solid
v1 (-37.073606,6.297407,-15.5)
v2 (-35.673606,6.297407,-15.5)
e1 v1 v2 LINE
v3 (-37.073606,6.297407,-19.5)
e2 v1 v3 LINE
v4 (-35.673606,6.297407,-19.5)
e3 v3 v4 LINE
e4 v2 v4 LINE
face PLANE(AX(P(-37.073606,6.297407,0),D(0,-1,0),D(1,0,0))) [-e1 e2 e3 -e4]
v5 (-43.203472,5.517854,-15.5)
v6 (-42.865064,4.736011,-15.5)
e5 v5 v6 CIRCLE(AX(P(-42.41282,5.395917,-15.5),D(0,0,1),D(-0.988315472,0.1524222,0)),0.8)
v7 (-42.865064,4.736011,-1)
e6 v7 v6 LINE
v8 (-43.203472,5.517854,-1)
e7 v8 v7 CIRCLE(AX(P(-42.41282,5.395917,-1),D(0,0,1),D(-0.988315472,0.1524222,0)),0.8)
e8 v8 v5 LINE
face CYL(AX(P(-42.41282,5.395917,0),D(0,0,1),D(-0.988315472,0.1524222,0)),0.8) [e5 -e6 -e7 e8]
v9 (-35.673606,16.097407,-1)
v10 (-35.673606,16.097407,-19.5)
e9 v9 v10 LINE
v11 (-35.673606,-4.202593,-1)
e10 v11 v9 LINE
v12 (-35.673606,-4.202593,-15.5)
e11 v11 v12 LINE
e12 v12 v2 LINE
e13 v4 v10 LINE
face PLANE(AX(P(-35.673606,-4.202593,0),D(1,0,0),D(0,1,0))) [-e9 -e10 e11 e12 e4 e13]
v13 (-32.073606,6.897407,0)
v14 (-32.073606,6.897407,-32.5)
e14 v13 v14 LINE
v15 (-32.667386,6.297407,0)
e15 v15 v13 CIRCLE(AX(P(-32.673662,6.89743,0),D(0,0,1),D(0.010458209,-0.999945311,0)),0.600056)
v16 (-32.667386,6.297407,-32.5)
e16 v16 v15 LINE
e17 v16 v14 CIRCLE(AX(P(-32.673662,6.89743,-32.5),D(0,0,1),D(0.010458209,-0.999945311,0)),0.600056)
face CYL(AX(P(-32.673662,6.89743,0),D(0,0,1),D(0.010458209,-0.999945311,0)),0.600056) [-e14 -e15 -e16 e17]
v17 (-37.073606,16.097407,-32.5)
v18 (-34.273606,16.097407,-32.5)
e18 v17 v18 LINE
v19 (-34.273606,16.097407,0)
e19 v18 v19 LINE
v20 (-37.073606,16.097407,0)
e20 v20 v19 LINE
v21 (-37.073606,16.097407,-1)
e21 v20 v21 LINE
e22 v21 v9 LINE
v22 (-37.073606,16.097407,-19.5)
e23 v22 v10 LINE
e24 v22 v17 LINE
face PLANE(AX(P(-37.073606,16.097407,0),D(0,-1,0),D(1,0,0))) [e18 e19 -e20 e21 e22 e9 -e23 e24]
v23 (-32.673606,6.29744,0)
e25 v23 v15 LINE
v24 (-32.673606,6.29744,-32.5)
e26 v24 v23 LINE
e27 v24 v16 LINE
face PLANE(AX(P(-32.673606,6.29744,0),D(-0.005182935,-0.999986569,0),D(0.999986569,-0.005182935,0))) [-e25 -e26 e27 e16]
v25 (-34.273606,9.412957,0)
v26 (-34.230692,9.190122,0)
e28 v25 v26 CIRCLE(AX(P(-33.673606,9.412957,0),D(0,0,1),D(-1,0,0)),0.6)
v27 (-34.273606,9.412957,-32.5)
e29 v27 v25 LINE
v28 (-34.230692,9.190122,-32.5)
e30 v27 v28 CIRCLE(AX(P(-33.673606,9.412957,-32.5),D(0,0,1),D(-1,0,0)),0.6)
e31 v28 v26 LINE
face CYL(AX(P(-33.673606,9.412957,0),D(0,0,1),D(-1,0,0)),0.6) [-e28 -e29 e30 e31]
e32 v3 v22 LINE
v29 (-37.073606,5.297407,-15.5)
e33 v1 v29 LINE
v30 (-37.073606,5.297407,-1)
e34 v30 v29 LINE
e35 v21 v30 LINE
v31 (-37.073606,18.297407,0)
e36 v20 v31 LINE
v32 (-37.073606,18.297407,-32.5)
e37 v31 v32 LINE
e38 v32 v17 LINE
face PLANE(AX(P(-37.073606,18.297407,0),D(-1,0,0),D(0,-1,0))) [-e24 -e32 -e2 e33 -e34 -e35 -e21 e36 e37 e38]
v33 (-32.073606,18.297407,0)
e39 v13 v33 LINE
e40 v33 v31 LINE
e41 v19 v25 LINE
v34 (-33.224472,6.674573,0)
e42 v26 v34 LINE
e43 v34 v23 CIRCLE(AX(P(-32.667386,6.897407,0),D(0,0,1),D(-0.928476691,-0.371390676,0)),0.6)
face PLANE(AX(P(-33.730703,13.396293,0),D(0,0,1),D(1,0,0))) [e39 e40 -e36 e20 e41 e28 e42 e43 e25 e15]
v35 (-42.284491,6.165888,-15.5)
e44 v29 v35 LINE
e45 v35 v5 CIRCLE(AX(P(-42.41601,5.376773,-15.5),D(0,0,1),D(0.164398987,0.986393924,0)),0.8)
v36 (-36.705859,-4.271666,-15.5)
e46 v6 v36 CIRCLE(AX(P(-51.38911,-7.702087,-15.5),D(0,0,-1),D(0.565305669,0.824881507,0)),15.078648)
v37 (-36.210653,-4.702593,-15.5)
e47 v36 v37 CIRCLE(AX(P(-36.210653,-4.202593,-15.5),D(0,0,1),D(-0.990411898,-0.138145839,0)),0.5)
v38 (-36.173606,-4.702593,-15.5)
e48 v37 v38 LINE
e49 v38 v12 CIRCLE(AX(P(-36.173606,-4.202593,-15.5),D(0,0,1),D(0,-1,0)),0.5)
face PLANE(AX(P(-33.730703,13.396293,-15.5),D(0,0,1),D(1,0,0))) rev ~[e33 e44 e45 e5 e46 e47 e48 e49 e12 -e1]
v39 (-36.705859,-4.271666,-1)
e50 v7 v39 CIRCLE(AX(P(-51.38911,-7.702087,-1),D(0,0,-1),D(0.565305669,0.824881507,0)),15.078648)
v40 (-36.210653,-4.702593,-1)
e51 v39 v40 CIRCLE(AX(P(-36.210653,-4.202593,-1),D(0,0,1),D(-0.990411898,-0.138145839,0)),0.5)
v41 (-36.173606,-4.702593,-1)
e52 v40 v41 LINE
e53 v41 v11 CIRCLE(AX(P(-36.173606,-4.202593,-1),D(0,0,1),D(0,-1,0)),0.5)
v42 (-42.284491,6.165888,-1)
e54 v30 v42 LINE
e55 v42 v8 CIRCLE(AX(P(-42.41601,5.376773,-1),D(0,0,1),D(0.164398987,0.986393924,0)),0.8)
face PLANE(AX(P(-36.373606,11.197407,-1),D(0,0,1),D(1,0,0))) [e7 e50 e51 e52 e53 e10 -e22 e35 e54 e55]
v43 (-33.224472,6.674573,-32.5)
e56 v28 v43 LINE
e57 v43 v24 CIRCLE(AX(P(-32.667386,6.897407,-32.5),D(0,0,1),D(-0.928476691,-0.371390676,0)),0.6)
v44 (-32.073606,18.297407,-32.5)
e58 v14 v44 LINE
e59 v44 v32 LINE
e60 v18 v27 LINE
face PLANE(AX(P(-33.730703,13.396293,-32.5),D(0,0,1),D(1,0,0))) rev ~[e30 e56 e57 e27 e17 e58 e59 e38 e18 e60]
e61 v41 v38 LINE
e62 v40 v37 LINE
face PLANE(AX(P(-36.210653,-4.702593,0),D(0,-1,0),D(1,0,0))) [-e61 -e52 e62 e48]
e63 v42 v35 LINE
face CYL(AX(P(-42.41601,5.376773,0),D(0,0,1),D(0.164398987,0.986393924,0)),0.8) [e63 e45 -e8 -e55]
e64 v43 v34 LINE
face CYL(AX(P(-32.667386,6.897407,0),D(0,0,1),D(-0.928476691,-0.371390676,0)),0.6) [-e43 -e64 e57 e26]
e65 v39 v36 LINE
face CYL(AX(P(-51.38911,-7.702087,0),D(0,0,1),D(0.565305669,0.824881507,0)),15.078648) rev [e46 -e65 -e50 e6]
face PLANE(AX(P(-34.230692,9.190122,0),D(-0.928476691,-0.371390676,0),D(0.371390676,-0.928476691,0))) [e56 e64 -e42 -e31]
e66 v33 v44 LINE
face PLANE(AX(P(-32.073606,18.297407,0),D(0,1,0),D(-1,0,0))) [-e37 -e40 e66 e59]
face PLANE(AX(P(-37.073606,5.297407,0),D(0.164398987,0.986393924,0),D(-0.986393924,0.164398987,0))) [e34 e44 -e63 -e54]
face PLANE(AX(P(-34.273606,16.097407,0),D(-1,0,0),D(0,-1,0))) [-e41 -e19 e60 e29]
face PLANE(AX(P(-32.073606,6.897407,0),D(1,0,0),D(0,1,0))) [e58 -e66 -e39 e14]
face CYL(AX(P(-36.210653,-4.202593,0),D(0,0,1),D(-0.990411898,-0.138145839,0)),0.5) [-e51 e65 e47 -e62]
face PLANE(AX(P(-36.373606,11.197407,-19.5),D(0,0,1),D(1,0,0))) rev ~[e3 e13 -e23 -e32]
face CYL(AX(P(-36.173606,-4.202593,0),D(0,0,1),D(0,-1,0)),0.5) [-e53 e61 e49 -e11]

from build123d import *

# Parameters (mm, degrees)
F0_W     = 1.4
F0_H     = 9.8
F1_DEPTH = 15.5
F2_DEPTH = 19.5
F3_DEPTH = 1
F4_DEPTH = 32.5


# Not quite as in the source:
# - ends of sketch curves that miss each other by under 0.0002 mm in the source are joined


with BuildPart() as f1:
    # F0 (on Top) → F1 (new body)
    with BuildSketch(Plane.XY):
        with BuildLine():
            Line((-32.0736061335, 18.2974073312), (-37.0736061335, 18.2974073312))
            Line((-37.0736061335, 18.2974073312), (-37.0736061335, 16.0974073312))
            Line((-37.0736061335, 16.0974073312), (-35.6736061335, 16.0974073312))
            Line((-35.6736061335, 16.0974073312), (-34.2736061335, 16.0974073312))
            Line((-34.2736061335, 16.0974073312), (-34.2736061335, 9.4129567733))
            ThreePointArc((-34.2736061335, 9.4129567733), (-34.2627799655, 9.2994922606), (-34.230692148, 9.1901223675))
            Line((-34.230692148, 9.1901223675), (-33.2244723711, 6.6745729254))
            ThreePointArc((-33.2244723711, 6.6745729254), (-33.0063342171, 6.402317089), (-32.6736057993, 6.2974395666))
            Line((-32.6736057993, 6.2974395666), (-32.6673863566, 6.2974073312))
            ThreePointArc((-32.6673863566, 6.2974073312), (-32.2471488287, 6.4753478956), (-32.0736061335, 6.8974073312))
            Line((-32.0736061335, 6.8974073312), (-32.0736061335, 18.2974073312))
        make_face()
        with Locations((-36.3736061335, 11.1974073312)):
            Rectangle(F0_W, F0_H)
        with BuildLine():
            Line((-35.6736061335, 6.2974073312), (-37.0736061335, 6.2974073312))
            Line((-37.0736061335, 6.2974073312), (-37.0736061335, 5.2974073312))
            Line((-37.0736061335, 5.2974073312), (-42.2844909944, 6.1658881413))
            ThreePointArc((-42.2844909944, 6.1658881413), (-42.8770439673, 6.0305679631), (-43.2034719774, 5.5178542706))
            ThreePointArc((-43.2034719774, 5.5178542706), (-43.1469979089, 5.0781395288), (-42.8650641349, 4.7360113048))
            ThreePointArc((-42.8650641349, 4.7360113048), (-38.9420533833, 0.8088724995), (-36.7058590055, -4.271665588))
            ThreePointArc((-36.7058590055, -4.271665588), (-36.5388782387, -4.5797772785), (-36.2106530565, -4.7025926688))
            Line((-36.2106530565, -4.7025926688), (-36.1736061335, -4.7025926688))
            ThreePointArc((-36.1736061335, -4.7025926688), (-35.8200527429, -4.5561460594), (-35.6736061335, -4.2025926688))
            Line((-35.6736061335, -4.2025926688), (-35.6736061335, 6.2974073312))
        make_face()
    extrude(amount=-F1_DEPTH)

    # F0 (on Top) → F2 (join)
    with BuildSketch(Plane.XY):
        with Locations((-36.3736061335, 11.1974073312)):
            Rectangle(F0_W, F0_H)
    extrude(amount=-F2_DEPTH)

    # F0 (on Top) → F3 (cut)
    with BuildSketch(Plane.XY):
        with Locations((-36.3736061335, 11.1974073312)):
            Rectangle(F0_W, F0_H)
        with BuildLine():
            Line((-35.6736061335, 6.2974073312), (-37.0736061335, 6.2974073312))
            Line((-37.0736061335, 6.2974073312), (-37.0736061335, 5.2974073312))
            Line((-37.0736061335, 5.2974073312), (-42.2844909944, 6.1658881413))
            ThreePointArc((-42.2844909944, 6.1658881413), (-42.8770439673, 6.0305679631), (-43.2034719774, 5.5178542706))
            ThreePointArc((-43.2034719774, 5.5178542706), (-43.1469979089, 5.0781395288), (-42.8650641349, 4.7360113048))
            ThreePointArc((-42.8650641349, 4.7360113048), (-38.9420533833, 0.8088724995), (-36.7058590055, -4.271665588))
            ThreePointArc((-36.7058590055, -4.271665588), (-36.5388782387, -4.5797772785), (-36.2106530565, -4.7025926688))
            Line((-36.2106530565, -4.7025926688), (-36.1736061335, -4.7025926688))
            ThreePointArc((-36.1736061335, -4.7025926688), (-35.8200527429, -4.5561460594), (-35.6736061335, -4.2025926688))
            Line((-35.6736061335, -4.2025926688), (-35.6736061335, 6.2974073312))
        make_face()
    extrude(amount=-F3_DEPTH, mode=Mode.SUBTRACT)

    # F0 (on Top) → F4 (join)
    with BuildSketch(Plane.XY):
        with BuildLine():
            Line((-32.0736061335, 18.2974073312), (-37.0736061335, 18.2974073312))
            Line((-37.0736061335, 18.2974073312), (-37.0736061335, 16.0974073312))
            Line((-37.0736061335, 16.0974073312), (-35.6736061335, 16.0974073312))
            Line((-35.6736061335, 16.0974073312), (-34.2736061335, 16.0974073312))
            Line((-34.2736061335, 16.0974073312), (-34.2736061335, 9.4129567733))
            ThreePointArc((-34.2736061335, 9.4129567733), (-34.2627799655, 9.2994922606), (-34.230692148, 9.1901223675))
            Line((-34.230692148, 9.1901223675), (-33.2244723711, 6.6745729254))
            ThreePointArc((-33.2244723711, 6.6745729254), (-33.0063342171, 6.402317089), (-32.6736057993, 6.2974395666))
            Line((-32.6736057993, 6.2974395666), (-32.6673863566, 6.2974073312))
            ThreePointArc((-32.6673863566, 6.2974073312), (-32.2471488287, 6.4753478956), (-32.0736061335, 6.8974073312))
            Line((-32.0736061335, 6.8974073312), (-32.0736061335, 18.2974073312))
        make_face()
    extrude(amount=-F4_DEPTH)


solid = f1.part
